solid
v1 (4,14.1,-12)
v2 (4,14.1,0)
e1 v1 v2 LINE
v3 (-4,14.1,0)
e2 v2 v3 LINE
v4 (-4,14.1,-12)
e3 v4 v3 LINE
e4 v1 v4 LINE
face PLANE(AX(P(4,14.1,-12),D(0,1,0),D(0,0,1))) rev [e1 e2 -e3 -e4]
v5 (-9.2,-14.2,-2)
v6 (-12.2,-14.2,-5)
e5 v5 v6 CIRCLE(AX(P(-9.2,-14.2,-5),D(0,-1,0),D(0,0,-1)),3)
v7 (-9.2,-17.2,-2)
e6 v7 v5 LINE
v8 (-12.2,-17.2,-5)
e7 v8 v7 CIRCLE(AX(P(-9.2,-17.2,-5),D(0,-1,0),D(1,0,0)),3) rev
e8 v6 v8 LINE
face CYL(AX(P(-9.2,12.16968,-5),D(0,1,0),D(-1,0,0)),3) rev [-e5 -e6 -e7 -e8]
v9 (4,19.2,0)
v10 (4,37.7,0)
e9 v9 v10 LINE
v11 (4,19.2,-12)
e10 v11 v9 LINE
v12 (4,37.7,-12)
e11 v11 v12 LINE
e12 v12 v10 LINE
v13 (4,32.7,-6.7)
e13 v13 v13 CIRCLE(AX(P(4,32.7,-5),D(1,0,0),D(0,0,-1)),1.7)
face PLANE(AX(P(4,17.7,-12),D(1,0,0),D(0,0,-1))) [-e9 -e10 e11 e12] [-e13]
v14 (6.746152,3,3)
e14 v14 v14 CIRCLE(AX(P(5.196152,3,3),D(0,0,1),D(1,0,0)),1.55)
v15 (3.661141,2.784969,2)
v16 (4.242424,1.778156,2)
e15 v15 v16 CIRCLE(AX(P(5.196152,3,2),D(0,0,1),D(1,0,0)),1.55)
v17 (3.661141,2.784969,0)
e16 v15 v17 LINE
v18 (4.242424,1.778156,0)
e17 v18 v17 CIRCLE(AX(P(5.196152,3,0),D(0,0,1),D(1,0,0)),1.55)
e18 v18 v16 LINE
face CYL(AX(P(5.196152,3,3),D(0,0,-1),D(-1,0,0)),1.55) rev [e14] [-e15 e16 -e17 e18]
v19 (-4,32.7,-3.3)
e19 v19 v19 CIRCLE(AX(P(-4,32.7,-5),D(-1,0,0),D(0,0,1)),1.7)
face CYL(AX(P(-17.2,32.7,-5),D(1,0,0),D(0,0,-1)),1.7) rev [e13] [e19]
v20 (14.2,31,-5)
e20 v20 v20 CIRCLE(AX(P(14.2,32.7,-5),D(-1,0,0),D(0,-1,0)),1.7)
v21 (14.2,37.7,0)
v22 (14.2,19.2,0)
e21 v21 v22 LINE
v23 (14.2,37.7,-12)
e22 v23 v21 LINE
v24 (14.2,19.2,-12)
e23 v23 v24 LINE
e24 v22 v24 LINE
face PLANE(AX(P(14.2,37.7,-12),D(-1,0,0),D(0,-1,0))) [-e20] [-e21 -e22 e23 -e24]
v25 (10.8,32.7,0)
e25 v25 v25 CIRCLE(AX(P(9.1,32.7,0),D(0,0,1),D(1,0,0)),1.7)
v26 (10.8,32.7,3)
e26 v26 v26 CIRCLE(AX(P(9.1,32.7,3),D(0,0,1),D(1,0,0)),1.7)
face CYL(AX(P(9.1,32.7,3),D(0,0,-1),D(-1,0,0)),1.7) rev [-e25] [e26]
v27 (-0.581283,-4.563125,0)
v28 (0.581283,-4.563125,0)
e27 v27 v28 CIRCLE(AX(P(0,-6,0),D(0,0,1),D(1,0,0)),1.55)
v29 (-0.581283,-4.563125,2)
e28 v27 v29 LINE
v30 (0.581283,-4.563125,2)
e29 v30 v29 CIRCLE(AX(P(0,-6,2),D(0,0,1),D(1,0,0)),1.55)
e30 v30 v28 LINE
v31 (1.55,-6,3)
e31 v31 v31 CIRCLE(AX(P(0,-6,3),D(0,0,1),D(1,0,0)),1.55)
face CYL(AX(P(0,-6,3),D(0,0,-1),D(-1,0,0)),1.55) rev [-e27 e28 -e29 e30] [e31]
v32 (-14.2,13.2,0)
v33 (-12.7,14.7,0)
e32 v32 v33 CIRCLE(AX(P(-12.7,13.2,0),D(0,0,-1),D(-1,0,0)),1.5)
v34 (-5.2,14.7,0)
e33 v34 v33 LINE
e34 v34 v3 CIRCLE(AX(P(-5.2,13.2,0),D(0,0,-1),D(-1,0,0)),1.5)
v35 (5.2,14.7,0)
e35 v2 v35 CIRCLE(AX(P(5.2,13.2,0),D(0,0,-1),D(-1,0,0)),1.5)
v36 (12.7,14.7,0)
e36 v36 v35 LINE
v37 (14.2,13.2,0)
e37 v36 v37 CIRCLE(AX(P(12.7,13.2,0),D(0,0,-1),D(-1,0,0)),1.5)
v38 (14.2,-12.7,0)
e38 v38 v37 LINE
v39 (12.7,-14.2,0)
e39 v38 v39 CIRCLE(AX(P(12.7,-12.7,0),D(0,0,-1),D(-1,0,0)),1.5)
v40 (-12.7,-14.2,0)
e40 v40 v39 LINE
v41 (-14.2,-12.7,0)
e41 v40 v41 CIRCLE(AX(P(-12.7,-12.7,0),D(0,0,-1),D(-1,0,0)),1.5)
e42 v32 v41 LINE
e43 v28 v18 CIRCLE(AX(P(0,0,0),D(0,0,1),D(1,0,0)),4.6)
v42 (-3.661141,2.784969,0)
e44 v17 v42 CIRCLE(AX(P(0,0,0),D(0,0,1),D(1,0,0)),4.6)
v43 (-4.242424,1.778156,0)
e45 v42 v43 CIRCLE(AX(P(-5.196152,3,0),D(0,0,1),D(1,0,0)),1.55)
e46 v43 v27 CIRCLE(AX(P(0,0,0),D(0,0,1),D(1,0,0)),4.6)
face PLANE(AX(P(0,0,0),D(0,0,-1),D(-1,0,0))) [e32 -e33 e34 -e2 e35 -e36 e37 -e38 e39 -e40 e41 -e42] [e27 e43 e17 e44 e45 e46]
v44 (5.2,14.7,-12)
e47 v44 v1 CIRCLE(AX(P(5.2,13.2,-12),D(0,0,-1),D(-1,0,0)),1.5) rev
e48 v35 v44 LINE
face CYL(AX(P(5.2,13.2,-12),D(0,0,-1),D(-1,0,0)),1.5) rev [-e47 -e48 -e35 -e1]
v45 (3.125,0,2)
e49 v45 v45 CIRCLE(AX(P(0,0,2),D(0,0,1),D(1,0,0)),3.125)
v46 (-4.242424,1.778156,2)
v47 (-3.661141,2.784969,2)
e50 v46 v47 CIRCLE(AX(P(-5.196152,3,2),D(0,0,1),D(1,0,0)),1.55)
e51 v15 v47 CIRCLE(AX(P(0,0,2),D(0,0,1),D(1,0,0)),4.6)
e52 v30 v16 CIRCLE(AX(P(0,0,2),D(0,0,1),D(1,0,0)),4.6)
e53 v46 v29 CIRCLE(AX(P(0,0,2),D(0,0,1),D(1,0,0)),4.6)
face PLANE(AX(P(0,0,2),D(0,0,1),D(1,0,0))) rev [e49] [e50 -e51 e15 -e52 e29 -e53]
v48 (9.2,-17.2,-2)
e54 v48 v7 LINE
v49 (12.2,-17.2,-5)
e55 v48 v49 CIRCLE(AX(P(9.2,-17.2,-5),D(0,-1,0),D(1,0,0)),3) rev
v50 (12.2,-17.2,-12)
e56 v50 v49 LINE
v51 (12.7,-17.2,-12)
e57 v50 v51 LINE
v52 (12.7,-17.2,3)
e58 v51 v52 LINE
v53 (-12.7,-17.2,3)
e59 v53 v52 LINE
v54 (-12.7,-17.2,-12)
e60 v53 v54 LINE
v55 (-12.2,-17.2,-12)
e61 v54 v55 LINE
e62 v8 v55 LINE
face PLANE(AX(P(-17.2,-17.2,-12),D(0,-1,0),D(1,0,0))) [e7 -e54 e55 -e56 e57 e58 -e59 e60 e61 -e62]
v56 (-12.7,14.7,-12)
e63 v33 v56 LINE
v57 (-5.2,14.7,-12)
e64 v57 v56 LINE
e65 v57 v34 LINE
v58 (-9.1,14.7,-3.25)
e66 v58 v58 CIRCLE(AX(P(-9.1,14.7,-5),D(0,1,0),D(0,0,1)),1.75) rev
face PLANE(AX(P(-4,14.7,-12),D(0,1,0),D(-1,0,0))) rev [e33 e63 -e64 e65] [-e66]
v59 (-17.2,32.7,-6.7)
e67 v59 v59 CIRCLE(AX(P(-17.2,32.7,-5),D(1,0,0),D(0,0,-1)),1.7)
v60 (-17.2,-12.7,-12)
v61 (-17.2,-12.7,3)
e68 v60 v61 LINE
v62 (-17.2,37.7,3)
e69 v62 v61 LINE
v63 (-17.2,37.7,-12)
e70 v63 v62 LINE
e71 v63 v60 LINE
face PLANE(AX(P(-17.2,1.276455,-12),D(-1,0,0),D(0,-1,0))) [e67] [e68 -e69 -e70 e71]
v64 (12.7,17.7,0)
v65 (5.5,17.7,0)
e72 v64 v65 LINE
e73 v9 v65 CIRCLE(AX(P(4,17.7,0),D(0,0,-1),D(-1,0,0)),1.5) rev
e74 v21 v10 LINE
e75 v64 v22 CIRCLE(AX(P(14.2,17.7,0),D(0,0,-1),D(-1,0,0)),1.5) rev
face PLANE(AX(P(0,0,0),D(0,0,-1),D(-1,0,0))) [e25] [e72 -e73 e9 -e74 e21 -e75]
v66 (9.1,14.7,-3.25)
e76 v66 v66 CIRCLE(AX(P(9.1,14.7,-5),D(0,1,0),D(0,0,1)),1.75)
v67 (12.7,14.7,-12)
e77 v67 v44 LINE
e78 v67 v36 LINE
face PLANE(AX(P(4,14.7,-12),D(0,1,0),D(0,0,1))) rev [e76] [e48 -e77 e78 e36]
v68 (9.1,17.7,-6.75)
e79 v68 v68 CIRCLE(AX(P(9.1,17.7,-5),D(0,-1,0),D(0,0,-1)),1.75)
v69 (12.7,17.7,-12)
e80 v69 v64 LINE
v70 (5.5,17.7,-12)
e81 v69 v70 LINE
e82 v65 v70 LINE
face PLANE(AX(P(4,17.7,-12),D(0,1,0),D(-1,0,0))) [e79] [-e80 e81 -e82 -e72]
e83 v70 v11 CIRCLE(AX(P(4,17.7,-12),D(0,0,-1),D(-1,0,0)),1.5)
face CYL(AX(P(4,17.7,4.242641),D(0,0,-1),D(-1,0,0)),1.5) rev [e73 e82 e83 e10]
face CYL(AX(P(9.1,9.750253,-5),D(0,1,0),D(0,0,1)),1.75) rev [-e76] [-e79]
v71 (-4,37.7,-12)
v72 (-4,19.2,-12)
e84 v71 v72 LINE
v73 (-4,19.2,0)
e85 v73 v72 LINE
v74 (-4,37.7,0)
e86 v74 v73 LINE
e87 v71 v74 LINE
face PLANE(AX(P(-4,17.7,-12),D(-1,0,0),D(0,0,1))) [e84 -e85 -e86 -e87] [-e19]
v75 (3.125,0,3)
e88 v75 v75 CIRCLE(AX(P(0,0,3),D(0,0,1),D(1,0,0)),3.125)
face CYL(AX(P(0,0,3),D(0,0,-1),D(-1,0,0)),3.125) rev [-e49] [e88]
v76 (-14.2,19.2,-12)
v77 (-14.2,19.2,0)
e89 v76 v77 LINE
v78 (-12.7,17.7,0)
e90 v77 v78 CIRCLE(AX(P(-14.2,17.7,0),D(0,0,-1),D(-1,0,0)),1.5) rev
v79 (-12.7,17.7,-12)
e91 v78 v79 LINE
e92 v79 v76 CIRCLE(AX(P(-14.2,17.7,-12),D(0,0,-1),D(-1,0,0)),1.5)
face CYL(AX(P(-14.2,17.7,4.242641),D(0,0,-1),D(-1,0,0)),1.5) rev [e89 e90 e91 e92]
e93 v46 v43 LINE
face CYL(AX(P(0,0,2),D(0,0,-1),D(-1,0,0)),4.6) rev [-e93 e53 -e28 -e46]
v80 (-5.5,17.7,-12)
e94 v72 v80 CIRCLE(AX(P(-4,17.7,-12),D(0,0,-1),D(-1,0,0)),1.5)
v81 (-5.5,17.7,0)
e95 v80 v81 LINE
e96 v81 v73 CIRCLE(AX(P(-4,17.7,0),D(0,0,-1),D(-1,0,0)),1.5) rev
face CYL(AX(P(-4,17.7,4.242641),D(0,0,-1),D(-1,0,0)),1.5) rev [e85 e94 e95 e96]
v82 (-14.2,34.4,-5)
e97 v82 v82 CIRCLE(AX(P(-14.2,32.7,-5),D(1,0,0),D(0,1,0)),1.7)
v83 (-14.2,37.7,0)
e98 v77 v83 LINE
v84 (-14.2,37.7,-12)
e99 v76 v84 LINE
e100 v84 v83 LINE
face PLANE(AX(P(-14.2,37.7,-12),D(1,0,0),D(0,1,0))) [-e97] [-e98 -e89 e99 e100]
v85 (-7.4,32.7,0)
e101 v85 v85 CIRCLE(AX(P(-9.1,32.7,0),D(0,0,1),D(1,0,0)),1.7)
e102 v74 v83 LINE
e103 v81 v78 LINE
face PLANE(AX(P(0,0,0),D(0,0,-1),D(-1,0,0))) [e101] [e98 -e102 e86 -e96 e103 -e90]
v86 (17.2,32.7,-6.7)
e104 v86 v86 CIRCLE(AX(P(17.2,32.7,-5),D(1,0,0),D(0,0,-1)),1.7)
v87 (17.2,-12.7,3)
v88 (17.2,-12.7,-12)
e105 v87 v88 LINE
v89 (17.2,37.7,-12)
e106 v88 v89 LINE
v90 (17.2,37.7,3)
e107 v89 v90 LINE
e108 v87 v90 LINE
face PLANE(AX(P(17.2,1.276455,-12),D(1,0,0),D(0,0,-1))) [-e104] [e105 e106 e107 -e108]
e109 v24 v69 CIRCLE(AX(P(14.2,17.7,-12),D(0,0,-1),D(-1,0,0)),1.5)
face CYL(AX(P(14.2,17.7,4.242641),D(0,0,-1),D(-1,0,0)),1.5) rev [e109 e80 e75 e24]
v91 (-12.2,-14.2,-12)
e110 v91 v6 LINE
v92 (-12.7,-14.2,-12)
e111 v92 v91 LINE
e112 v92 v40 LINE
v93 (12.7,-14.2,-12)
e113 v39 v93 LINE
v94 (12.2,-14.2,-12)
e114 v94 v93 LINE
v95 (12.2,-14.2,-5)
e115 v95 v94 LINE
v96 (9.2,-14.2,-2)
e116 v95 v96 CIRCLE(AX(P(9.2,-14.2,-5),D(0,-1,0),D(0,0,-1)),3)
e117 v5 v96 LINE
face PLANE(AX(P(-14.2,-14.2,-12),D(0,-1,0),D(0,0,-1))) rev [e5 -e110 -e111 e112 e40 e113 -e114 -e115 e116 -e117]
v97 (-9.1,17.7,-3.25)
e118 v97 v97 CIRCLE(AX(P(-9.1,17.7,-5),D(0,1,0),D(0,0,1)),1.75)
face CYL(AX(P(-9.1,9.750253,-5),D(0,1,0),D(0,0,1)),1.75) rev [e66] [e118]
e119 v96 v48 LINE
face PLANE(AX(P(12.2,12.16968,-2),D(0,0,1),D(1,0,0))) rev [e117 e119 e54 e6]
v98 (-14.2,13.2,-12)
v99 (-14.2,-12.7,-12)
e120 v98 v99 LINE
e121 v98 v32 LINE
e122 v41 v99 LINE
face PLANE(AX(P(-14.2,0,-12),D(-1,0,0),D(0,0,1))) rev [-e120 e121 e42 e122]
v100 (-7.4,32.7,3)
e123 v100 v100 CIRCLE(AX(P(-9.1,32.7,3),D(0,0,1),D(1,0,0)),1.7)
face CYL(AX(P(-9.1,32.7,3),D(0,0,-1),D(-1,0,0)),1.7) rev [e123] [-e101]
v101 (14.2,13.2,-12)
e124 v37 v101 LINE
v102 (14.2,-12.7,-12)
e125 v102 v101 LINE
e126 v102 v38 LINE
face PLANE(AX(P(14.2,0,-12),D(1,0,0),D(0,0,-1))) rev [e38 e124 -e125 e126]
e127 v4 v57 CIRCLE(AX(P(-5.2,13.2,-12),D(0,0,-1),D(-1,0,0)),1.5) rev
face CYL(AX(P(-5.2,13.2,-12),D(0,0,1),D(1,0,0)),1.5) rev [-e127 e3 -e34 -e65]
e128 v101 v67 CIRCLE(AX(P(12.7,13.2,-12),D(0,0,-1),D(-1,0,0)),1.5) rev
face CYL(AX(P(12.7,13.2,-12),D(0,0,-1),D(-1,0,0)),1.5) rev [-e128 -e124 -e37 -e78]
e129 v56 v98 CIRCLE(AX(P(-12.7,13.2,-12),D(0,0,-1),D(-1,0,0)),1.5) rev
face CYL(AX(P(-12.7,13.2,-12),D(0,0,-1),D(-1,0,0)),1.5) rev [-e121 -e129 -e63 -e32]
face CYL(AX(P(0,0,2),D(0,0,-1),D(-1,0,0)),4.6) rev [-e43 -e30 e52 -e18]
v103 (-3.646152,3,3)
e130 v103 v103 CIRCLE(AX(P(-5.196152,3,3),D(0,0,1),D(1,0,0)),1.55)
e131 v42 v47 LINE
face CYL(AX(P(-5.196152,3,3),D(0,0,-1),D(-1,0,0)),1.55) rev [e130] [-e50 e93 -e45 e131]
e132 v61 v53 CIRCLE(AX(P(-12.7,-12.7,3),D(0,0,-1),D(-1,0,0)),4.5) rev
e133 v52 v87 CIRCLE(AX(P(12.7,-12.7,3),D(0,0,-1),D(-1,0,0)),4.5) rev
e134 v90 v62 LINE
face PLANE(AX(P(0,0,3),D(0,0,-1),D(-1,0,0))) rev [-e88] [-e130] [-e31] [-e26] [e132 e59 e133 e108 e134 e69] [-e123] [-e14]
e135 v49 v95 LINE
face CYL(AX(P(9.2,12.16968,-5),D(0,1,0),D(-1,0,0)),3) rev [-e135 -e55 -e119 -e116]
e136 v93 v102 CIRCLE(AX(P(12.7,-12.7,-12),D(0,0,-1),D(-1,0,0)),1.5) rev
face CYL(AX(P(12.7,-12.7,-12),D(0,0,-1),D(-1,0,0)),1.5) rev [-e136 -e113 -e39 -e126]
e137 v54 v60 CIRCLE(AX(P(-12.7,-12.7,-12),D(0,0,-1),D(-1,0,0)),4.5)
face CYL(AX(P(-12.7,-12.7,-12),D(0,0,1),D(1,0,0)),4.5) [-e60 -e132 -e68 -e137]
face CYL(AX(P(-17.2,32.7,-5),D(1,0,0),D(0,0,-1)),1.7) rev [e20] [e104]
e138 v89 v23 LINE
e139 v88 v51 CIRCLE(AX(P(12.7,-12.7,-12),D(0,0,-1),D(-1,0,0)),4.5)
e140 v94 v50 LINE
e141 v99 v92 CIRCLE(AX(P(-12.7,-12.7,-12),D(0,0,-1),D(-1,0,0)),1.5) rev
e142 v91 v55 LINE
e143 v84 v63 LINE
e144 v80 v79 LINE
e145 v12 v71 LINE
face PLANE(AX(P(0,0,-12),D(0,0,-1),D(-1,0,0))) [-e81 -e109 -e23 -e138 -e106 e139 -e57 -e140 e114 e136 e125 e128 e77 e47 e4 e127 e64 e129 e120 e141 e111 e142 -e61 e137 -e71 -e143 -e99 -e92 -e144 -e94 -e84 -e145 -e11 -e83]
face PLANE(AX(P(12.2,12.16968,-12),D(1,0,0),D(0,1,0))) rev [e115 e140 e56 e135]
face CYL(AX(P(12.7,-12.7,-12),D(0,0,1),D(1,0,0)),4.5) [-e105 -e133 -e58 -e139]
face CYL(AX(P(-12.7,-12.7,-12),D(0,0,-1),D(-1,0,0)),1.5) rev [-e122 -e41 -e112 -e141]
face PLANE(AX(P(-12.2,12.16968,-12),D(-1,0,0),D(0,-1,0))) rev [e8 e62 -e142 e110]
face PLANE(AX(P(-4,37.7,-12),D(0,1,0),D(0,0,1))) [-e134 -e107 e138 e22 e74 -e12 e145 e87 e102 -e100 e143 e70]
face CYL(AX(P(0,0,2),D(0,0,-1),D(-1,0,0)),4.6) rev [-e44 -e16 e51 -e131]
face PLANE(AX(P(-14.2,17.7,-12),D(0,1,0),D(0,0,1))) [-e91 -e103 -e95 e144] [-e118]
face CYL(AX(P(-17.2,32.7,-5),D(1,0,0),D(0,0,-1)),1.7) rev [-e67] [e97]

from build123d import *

# Parameters (mm, degrees)
MAIN_POCKETS_DEPTH   = 12
SKETCH2_W            = 34.4
SKETCH2_H            = 54.9
SKETCH2_R            = 1.55
SKETCH2_R_2          = 1.7
SKETCH2_R_3          = 3.125
MOUNTING_HOLES_DEPTH = 3
SKETCH3_R            = 4.6
CUT_EXTRUDE1_DEPTH   = 2
SKETCH4_R            = 1.5
CUT_EXTRUDE2_DEPTH   = 12
SKETCH5_R            = 1.75
CUT_EXTRUDE4_DEPTH   = 3
SKETCH6_W            = 24.4
SKETCH6_H            = 10
CUT_EXTRUDE6_DEPTH   = 3
SKETCH8_R            = 1.7
CUT_EXTRUDE7_DEPTH   = 53.427569083
FILLET1_R            = 1.5
FILLET2_R            = 4.5
FILLET3_R            = 3


with BuildPart() as part:
    # Sketch1 → Main Pockets (new body)
    with BuildSketch(Plane.XY):
        Polygon((17.2, 1.276454737), (17.2, 37.7), (14.2, 37.7), (14.2, 17.7), (4, 17.7), (4, 37.7), (-4, 37.7), (-4, 17.7), (-14.2, 17.7), (-14.2, 37.7), (-17.2, 37.7), (-17.2, 1.276454737), (-17.2, -17.2), (17.2, -17.2), align=None)
        Polygon((-14.2, -14.2), (14.2, -14.2), (14.2, 0), (14.2, 14.7), (4, 14.7), (4, 14.1), (-4, 14.1), (-4, 14.7), (-14.2, 14.7), (-14.2, 0), align=None, mode=Mode.SUBTRACT)
    extrude(amount=-MAIN_POCKETS_DEPTH)

    # Sketch2 → Mounting Holes (add)
    with BuildSketch(Plane.XY):
        with Locations((0, 10.25)):
            Rectangle(SKETCH2_W, SKETCH2_H)
        with Locations((0, -6)):
            Circle(SKETCH2_R, mode=Mode.SUBTRACT)
        with Locations((-5.196152423, 3)):
            Circle(SKETCH2_R, mode=Mode.SUBTRACT)
        with Locations((5.196152423, 3)):
            Circle(SKETCH2_R, mode=Mode.SUBTRACT)
        with Locations((-9.1, 32.7)):
            Circle(SKETCH2_R_2, mode=Mode.SUBTRACT)
        with Locations((9.1, 32.7)):
            Circle(SKETCH2_R_2, mode=Mode.SUBTRACT)
        Circle(SKETCH2_R_3, mode=Mode.SUBTRACT)
    extrude(amount=MOUNTING_HOLES_DEPTH)

    # Sketch3 → Cut-Extrude1 (cut)
    with BuildSketch(Plane.XY):
        Circle(SKETCH3_R)
    extrude(amount=CUT_EXTRUDE1_DEPTH, mode=Mode.SUBTRACT)

    # Sketch4 → Cut-Extrude2 (cut)
    with BuildSketch(Plane(origin=(0, 0, -12), x_dir=(-1, 0, 0), z_dir=(0, 0, -1))):
        with Locations((-14.2, 17.7)):
            Circle(SKETCH4_R)
        with Locations((-4, 17.7)):
            Circle(SKETCH4_R)
        with Locations((4, 17.7)):
            Circle(SKETCH4_R)
        with Locations((14.2, 17.7)):
            Circle(SKETCH4_R)
    extrude(amount=-CUT_EXTRUDE2_DEPTH, mode=Mode.SUBTRACT)

    # Sketch5 → Cut-Extrude4 (cut)
    with BuildSketch(Plane(origin=(0, 17.7, 0), x_dir=(1, 0, 0), z_dir=(0, 1, 0))):
        with Locations(Location((-9.1, 5, 0), (0, 0, 270))):
            Circle(SKETCH5_R)
        with Locations(Location((9.1, 5, 0), (0, 0, 270))):
            Circle(SKETCH5_R)
    extrude(amount=-CUT_EXTRUDE4_DEPTH, mode=Mode.SUBTRACT)

    # Sketch6 → Cut-Extrude6 (cut)
    with BuildSketch(Plane.XZ.offset(17.2)):
        with Locations((0, -7)):
            Rectangle(SKETCH6_W, SKETCH6_H)
    extrude(amount=-CUT_EXTRUDE6_DEPTH, mode=Mode.SUBTRACT)

    # Sketch8 → Cut-Extrude7 (cut, through all)
    with BuildSketch(Plane(origin=(17.2, 0, 0), x_dir=(0, 0, -1), z_dir=(1, 0, 0))):
        with Locations((5, 32.7)):
            Circle(SKETCH8_R)
    extrude(amount=-CUT_EXTRUDE7_DEPTH, mode=Mode.SUBTRACT)

    # Fillet1
    # the kernel refuses this fillet: 1.5 mm, written as the material it adds along each edge
    with BuildSketch(Plane(origin=(-4, 14.7, 3), x_dir=(0, -1, 0), z_dir=(0, 0, -1))) as fillet1_piece_1:
        with BuildLine():
            CenterArc((1.5, 1.2), FILLET1_R, 180, 53.130102354)
            Line((0, 1.2), (0, 0))
            Line((0, 0), (0.6, 0))
        make_face()
    extrude(amount=15)
    with BuildSketch(Plane(origin=(4, 14.7, 3), x_dir=(1, 0, 0), z_dir=(0, 0, -1))) as fillet1_piece_2:
        with BuildLine():
            CenterArc((1.2, 1.5), FILLET1_R, 216.869897646, 53.130102354)
            Line((0, 0.6), (0, 0))
            Line((0, 0), (1.2, 0))
        make_face()
    extrude(amount=15)
    with BuildSketch(Plane(origin=(-14.2, -14.2, 0), x_dir=(1, 0, 0), z_dir=(0, 0, -1))) as fillet1_piece_3:
        with BuildLine():
            CenterArc((FILLET1_R, -FILLET1_R), FILLET1_R, 90, 90)
            Line((0, -FILLET1_R), (0, 0))
            Line((0, 0), (FILLET1_R, 0))
        make_face()
    extrude(amount=12)
    with BuildSketch(Plane(origin=(-14.2, 14.7, 0), x_dir=(1, 0, 0), z_dir=(0, 0, -1)), Plane(origin=(14.2, 14.7, 0), x_dir=(0, -1, 0), z_dir=(0, 0, -1)), Plane(origin=(14.2, -14.2, 0), x_dir=(-1, 0, 0), z_dir=(0, 0, -1))) as fillet1_piece_4:
        with BuildLine():
            CenterArc((FILLET1_R, FILLET1_R), FILLET1_R, 180, 90)
            Line((0, FILLET1_R), (0, 0))
            Line((0, 0), (FILLET1_R, 0))
        make_face()
    extrude(amount=12)

    # Fillet2
    fillet2_edges = [part.edges().sort_by_distance(p)[0] for p in [
        (17.2, -17.2, -4.5),
        (-17.2, -17.2, -4.5),
    ]]
    fillet(fillet2_edges, radius=FILLET2_R)

    # Fillet3
    fillet3_edges = [part.edges().sort_by_distance(p)[0] for p in [
        (-12.2, -15.7, -2),
        (12.2, -15.7, -2),
    ]]
    fillet(fillet3_edges, radius=FILLET3_R)


solid = part.part
